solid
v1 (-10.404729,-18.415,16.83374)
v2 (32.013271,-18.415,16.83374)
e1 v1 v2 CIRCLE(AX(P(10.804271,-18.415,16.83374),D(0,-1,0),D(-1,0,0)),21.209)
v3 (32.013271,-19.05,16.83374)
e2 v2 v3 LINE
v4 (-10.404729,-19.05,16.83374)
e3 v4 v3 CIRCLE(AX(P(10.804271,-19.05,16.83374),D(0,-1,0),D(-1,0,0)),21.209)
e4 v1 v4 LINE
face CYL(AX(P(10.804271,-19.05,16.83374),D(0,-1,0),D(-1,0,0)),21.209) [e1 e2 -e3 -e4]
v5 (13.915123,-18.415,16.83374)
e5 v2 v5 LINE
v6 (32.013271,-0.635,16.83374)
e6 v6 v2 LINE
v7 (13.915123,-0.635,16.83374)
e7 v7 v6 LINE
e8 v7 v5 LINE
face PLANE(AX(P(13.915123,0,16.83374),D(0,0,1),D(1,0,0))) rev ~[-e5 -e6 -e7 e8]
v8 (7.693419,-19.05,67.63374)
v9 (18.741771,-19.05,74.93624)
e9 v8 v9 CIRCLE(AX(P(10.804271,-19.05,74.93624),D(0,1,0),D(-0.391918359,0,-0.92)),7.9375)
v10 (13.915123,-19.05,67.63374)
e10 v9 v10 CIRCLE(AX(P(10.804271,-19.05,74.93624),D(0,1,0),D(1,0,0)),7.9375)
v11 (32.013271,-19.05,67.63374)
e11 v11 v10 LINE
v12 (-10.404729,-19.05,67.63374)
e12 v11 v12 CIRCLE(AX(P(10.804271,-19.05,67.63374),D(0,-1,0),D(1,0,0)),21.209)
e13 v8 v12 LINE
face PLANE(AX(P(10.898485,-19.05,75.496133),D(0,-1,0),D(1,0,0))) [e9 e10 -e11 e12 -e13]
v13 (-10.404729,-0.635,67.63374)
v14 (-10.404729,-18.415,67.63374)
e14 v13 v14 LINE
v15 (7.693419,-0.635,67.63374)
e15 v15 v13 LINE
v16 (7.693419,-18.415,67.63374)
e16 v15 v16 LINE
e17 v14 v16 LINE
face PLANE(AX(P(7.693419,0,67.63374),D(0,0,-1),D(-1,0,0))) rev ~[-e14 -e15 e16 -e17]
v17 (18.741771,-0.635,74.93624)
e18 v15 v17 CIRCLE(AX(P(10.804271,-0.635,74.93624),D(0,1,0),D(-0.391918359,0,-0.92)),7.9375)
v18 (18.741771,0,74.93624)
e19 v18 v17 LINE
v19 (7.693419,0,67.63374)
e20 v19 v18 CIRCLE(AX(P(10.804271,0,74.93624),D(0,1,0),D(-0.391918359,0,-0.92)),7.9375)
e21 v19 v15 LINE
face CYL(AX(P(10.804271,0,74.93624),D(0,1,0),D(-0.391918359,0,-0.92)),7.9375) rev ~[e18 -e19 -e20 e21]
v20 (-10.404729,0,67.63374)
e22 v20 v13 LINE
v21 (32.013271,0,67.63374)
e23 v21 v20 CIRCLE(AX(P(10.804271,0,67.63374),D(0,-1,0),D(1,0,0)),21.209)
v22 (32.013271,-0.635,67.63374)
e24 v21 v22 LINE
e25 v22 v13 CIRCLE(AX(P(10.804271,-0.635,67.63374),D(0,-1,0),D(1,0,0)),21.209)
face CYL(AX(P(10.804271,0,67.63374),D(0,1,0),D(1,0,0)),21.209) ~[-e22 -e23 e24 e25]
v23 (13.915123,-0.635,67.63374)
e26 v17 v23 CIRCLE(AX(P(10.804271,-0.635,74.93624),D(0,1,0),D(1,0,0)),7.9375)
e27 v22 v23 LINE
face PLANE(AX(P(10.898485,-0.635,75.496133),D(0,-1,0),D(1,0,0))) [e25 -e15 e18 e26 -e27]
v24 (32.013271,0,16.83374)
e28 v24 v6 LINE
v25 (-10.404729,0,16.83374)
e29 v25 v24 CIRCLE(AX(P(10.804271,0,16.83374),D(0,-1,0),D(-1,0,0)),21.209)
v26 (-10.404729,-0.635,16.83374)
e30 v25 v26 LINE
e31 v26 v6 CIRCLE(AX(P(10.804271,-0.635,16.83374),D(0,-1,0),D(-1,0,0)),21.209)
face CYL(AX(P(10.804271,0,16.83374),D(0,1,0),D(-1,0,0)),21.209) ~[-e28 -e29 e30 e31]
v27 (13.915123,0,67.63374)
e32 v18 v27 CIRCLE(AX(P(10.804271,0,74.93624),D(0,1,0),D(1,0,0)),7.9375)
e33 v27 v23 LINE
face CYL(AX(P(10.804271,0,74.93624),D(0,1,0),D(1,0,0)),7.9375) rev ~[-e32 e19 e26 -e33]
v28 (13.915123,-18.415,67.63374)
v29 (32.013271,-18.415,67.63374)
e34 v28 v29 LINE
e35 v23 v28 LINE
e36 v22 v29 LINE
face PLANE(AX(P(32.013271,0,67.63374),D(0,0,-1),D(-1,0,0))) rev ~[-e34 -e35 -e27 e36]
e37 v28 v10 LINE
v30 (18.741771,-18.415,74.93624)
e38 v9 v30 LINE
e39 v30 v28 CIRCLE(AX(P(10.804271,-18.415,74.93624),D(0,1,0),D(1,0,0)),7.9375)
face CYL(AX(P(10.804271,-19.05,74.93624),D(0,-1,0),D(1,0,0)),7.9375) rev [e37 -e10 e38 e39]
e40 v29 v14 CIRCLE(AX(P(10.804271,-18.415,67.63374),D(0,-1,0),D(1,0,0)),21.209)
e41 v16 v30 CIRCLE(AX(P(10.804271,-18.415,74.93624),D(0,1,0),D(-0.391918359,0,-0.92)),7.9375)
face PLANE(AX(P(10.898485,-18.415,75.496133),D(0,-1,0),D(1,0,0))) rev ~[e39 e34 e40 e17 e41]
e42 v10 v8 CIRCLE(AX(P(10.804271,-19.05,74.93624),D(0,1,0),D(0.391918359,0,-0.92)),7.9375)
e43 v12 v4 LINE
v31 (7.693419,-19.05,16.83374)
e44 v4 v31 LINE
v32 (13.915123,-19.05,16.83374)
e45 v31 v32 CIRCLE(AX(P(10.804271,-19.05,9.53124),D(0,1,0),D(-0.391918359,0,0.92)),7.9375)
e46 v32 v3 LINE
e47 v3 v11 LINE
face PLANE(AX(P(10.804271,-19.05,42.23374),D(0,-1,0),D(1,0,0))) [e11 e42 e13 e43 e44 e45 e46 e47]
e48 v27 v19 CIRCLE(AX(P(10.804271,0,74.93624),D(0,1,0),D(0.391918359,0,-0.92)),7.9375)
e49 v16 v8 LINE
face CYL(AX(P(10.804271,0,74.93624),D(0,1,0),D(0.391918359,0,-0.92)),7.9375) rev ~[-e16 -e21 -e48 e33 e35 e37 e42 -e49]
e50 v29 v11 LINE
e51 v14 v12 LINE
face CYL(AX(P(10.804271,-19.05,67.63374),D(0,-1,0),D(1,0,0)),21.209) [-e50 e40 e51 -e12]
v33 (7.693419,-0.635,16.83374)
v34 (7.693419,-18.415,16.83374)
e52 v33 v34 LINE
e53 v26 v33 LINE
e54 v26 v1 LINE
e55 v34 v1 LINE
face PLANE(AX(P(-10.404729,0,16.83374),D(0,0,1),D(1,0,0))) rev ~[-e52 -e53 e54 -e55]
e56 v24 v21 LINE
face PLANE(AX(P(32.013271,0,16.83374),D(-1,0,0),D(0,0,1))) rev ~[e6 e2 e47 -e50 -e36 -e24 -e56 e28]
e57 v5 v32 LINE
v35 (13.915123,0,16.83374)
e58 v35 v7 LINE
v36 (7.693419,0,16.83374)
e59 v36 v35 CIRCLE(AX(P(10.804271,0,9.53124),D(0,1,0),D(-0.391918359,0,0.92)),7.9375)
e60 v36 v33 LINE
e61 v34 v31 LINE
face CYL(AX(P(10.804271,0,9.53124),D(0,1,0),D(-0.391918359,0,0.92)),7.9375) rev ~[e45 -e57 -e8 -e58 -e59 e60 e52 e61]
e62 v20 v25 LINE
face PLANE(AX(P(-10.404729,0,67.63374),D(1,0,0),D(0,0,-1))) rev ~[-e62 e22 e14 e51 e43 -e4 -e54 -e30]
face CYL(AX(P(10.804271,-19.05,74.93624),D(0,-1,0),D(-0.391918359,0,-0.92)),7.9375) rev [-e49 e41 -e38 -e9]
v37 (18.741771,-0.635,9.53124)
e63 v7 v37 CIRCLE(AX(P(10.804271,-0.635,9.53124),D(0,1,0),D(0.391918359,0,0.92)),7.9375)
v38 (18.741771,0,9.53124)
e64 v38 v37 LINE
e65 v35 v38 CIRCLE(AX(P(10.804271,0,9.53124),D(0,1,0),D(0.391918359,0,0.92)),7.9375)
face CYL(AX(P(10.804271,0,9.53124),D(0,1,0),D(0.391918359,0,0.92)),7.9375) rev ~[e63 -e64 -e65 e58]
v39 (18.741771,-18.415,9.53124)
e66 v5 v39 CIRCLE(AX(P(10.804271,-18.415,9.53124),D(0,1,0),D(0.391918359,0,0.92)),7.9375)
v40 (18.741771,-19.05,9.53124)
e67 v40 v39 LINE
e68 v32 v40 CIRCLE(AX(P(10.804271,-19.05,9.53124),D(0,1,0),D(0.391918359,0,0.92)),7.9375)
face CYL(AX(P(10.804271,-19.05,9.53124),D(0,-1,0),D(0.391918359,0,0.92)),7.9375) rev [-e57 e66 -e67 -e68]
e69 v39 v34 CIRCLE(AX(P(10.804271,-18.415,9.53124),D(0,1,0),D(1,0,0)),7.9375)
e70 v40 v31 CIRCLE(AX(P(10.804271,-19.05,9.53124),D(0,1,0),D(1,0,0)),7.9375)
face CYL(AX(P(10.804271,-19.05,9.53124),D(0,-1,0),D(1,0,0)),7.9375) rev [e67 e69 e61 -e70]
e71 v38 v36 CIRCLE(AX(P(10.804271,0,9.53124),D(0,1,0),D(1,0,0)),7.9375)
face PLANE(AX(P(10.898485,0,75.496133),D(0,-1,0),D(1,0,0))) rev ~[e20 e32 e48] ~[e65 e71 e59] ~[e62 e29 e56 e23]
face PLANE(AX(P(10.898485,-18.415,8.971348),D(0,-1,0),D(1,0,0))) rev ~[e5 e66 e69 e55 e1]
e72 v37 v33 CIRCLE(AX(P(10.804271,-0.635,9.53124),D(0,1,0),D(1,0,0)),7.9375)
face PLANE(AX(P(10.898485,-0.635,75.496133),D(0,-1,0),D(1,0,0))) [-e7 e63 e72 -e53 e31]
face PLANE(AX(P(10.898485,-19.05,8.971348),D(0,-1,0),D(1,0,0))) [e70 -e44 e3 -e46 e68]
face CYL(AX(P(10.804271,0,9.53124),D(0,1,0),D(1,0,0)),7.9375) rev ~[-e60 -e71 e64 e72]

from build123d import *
from build123d import SkipClean  # not in build123d's __all__

# Parameters (mm, degrees)
F1_DEPTH = 19.05
F2_DEPTH = 0.635
F4_DEPTH = 0.635


with BuildPart() as f1:
    # F0 (on Front) → F1 (new body)
    with BuildSketch(Plane.XZ):
        with BuildLine():
            Line((7.6934193521, 67.6337401125), (-10.4047286745, 67.6337401125))
            Line((-10.4047286745, 67.6337401125), (-10.4047286745, 16.8337401125))
            Line((-10.4047286745, 16.8337401125), (7.6934193521, 16.8337401125))
            ThreePointArc((7.6934193521, 16.8337401125), (10.8042713255, 17.4687401125), (13.9151232988, 16.8337401125))
            Line((13.9151232988, 16.8337401125), (32.0132713255, 16.8337401125))
            Line((32.0132713255, 16.8337401125), (32.0132713255, 67.6337401125))
            Line((32.0132713255, 67.6337401125), (13.9151232988, 67.6337401125))
            ThreePointArc((13.9151232988, 67.6337401125), (10.8042713255, 66.9987401125), (7.6934193521, 67.6337401125))
        make_face()
    extrude(amount=F1_DEPTH)

    # F0 (on Front) → F2 (join)
    with BuildSketch(Plane.XZ):
        with BuildLine():
            ThreePointArc((32.0132713255, 67.6337401125), (10.8042713255, 88.8427401125), (-10.4047286745, 67.6337401125))
            Line((-10.4047286745, 67.6337401125), (7.6934193521, 67.6337401125))
            ThreePointArc((7.6934193521, 67.6337401125), (6.4275420266, 81.5580334417), (18.7417713255, 74.9362401125))
            ThreePointArc((18.7417713255, 74.9362401125), (17.4260646546, 70.5595108136), (13.9151232988, 67.6337401125))
            Line((13.9151232988, 67.6337401125), (32.0132713255, 67.6337401125))
        make_face()
        with BuildLine():
            Line((7.6934193521, 67.6337401125), (-10.4047286745, 67.6337401125))
            Line((-10.4047286745, 67.6337401125), (-10.4047286745, 16.8337401125))
            Line((-10.4047286745, 16.8337401125), (7.6934193521, 16.8337401125))
            ThreePointArc((7.6934193521, 16.8337401125), (10.8042713255, 17.4687401125), (13.9151232988, 16.8337401125))
            Line((13.9151232988, 16.8337401125), (32.0132713255, 16.8337401125))
            Line((32.0132713255, 16.8337401125), (32.0132713255, 67.6337401125))
            Line((32.0132713255, 67.6337401125), (13.9151232988, 67.6337401125))
            ThreePointArc((13.9151232988, 67.6337401125), (10.8042713255, 66.9987401125), (7.6934193521, 67.6337401125))
        make_face()
        with BuildLine():
            Line((7.6934193521, 16.8337401125), (-10.4047286745, 16.8337401125))
            ThreePointArc((-10.4047286745, 16.8337401125), (10.8042713255, -4.3752598875), (32.0132713255, 16.8337401125))
            Line((32.0132713255, 16.8337401125), (13.9151232988, 16.8337401125))
            ThreePointArc((13.9151232988, 16.8337401125), (17.4260646546, 13.9079694114), (18.7417713255, 9.5312401125))
            ThreePointArc((18.7417713255, 9.5312401125), (6.4275420266, 2.9094467834), (7.6934193521, 16.8337401125))
        make_face()
    extrude(amount=F2_DEPTH)

    # F3 (on face) → F4 (join)
    with BuildSketch(Plane.XZ.offset(19.05)):
        with BuildLine():
            ThreePointArc((-10.4047286745, 16.8337401125), (10.8042713255, -4.3752598875), (32.0132713255, 16.8337401125))
            Line((32.0132713255, 16.8337401125), (13.9151232988, 16.8337401125))
            ThreePointArc((13.9151232988, 16.8337401125), (17.4260646546, 13.9079694114), (18.7417713255, 9.5312401125))
            ThreePointArc((18.7417713255, 9.5312401125), (6.4275420266, 2.9094467834), (7.6934193521, 16.8337401125))
            Line((7.6934193521, 16.8337401125), (-10.4047286745, 16.8337401125))
        make_face()
        with BuildLine():
            Line((13.9151232988, 67.6337401125), (32.0132713255, 67.6337401125))
            ThreePointArc((32.0132713255, 67.6337401125), (10.8042713255, 88.8427401125), (-10.4047286745, 67.6337401125))
            Line((-10.4047286745, 67.6337401125), (7.6934193521, 67.6337401125))
            ThreePointArc((7.6934193521, 67.6337401125), (6.4275420266, 81.5580334417), (18.7417713255, 74.9362401125))
            ThreePointArc((18.7417713255, 74.9362401125), (17.4260646546, 70.5595108136), (13.9151232988, 67.6337401125))
        make_face()
    with SkipClean():  # cleaning this boolean's faces spoils the solid; the shape is the same uncleaned
        extrude(amount=-F4_DEPTH)


solid = f1.part
